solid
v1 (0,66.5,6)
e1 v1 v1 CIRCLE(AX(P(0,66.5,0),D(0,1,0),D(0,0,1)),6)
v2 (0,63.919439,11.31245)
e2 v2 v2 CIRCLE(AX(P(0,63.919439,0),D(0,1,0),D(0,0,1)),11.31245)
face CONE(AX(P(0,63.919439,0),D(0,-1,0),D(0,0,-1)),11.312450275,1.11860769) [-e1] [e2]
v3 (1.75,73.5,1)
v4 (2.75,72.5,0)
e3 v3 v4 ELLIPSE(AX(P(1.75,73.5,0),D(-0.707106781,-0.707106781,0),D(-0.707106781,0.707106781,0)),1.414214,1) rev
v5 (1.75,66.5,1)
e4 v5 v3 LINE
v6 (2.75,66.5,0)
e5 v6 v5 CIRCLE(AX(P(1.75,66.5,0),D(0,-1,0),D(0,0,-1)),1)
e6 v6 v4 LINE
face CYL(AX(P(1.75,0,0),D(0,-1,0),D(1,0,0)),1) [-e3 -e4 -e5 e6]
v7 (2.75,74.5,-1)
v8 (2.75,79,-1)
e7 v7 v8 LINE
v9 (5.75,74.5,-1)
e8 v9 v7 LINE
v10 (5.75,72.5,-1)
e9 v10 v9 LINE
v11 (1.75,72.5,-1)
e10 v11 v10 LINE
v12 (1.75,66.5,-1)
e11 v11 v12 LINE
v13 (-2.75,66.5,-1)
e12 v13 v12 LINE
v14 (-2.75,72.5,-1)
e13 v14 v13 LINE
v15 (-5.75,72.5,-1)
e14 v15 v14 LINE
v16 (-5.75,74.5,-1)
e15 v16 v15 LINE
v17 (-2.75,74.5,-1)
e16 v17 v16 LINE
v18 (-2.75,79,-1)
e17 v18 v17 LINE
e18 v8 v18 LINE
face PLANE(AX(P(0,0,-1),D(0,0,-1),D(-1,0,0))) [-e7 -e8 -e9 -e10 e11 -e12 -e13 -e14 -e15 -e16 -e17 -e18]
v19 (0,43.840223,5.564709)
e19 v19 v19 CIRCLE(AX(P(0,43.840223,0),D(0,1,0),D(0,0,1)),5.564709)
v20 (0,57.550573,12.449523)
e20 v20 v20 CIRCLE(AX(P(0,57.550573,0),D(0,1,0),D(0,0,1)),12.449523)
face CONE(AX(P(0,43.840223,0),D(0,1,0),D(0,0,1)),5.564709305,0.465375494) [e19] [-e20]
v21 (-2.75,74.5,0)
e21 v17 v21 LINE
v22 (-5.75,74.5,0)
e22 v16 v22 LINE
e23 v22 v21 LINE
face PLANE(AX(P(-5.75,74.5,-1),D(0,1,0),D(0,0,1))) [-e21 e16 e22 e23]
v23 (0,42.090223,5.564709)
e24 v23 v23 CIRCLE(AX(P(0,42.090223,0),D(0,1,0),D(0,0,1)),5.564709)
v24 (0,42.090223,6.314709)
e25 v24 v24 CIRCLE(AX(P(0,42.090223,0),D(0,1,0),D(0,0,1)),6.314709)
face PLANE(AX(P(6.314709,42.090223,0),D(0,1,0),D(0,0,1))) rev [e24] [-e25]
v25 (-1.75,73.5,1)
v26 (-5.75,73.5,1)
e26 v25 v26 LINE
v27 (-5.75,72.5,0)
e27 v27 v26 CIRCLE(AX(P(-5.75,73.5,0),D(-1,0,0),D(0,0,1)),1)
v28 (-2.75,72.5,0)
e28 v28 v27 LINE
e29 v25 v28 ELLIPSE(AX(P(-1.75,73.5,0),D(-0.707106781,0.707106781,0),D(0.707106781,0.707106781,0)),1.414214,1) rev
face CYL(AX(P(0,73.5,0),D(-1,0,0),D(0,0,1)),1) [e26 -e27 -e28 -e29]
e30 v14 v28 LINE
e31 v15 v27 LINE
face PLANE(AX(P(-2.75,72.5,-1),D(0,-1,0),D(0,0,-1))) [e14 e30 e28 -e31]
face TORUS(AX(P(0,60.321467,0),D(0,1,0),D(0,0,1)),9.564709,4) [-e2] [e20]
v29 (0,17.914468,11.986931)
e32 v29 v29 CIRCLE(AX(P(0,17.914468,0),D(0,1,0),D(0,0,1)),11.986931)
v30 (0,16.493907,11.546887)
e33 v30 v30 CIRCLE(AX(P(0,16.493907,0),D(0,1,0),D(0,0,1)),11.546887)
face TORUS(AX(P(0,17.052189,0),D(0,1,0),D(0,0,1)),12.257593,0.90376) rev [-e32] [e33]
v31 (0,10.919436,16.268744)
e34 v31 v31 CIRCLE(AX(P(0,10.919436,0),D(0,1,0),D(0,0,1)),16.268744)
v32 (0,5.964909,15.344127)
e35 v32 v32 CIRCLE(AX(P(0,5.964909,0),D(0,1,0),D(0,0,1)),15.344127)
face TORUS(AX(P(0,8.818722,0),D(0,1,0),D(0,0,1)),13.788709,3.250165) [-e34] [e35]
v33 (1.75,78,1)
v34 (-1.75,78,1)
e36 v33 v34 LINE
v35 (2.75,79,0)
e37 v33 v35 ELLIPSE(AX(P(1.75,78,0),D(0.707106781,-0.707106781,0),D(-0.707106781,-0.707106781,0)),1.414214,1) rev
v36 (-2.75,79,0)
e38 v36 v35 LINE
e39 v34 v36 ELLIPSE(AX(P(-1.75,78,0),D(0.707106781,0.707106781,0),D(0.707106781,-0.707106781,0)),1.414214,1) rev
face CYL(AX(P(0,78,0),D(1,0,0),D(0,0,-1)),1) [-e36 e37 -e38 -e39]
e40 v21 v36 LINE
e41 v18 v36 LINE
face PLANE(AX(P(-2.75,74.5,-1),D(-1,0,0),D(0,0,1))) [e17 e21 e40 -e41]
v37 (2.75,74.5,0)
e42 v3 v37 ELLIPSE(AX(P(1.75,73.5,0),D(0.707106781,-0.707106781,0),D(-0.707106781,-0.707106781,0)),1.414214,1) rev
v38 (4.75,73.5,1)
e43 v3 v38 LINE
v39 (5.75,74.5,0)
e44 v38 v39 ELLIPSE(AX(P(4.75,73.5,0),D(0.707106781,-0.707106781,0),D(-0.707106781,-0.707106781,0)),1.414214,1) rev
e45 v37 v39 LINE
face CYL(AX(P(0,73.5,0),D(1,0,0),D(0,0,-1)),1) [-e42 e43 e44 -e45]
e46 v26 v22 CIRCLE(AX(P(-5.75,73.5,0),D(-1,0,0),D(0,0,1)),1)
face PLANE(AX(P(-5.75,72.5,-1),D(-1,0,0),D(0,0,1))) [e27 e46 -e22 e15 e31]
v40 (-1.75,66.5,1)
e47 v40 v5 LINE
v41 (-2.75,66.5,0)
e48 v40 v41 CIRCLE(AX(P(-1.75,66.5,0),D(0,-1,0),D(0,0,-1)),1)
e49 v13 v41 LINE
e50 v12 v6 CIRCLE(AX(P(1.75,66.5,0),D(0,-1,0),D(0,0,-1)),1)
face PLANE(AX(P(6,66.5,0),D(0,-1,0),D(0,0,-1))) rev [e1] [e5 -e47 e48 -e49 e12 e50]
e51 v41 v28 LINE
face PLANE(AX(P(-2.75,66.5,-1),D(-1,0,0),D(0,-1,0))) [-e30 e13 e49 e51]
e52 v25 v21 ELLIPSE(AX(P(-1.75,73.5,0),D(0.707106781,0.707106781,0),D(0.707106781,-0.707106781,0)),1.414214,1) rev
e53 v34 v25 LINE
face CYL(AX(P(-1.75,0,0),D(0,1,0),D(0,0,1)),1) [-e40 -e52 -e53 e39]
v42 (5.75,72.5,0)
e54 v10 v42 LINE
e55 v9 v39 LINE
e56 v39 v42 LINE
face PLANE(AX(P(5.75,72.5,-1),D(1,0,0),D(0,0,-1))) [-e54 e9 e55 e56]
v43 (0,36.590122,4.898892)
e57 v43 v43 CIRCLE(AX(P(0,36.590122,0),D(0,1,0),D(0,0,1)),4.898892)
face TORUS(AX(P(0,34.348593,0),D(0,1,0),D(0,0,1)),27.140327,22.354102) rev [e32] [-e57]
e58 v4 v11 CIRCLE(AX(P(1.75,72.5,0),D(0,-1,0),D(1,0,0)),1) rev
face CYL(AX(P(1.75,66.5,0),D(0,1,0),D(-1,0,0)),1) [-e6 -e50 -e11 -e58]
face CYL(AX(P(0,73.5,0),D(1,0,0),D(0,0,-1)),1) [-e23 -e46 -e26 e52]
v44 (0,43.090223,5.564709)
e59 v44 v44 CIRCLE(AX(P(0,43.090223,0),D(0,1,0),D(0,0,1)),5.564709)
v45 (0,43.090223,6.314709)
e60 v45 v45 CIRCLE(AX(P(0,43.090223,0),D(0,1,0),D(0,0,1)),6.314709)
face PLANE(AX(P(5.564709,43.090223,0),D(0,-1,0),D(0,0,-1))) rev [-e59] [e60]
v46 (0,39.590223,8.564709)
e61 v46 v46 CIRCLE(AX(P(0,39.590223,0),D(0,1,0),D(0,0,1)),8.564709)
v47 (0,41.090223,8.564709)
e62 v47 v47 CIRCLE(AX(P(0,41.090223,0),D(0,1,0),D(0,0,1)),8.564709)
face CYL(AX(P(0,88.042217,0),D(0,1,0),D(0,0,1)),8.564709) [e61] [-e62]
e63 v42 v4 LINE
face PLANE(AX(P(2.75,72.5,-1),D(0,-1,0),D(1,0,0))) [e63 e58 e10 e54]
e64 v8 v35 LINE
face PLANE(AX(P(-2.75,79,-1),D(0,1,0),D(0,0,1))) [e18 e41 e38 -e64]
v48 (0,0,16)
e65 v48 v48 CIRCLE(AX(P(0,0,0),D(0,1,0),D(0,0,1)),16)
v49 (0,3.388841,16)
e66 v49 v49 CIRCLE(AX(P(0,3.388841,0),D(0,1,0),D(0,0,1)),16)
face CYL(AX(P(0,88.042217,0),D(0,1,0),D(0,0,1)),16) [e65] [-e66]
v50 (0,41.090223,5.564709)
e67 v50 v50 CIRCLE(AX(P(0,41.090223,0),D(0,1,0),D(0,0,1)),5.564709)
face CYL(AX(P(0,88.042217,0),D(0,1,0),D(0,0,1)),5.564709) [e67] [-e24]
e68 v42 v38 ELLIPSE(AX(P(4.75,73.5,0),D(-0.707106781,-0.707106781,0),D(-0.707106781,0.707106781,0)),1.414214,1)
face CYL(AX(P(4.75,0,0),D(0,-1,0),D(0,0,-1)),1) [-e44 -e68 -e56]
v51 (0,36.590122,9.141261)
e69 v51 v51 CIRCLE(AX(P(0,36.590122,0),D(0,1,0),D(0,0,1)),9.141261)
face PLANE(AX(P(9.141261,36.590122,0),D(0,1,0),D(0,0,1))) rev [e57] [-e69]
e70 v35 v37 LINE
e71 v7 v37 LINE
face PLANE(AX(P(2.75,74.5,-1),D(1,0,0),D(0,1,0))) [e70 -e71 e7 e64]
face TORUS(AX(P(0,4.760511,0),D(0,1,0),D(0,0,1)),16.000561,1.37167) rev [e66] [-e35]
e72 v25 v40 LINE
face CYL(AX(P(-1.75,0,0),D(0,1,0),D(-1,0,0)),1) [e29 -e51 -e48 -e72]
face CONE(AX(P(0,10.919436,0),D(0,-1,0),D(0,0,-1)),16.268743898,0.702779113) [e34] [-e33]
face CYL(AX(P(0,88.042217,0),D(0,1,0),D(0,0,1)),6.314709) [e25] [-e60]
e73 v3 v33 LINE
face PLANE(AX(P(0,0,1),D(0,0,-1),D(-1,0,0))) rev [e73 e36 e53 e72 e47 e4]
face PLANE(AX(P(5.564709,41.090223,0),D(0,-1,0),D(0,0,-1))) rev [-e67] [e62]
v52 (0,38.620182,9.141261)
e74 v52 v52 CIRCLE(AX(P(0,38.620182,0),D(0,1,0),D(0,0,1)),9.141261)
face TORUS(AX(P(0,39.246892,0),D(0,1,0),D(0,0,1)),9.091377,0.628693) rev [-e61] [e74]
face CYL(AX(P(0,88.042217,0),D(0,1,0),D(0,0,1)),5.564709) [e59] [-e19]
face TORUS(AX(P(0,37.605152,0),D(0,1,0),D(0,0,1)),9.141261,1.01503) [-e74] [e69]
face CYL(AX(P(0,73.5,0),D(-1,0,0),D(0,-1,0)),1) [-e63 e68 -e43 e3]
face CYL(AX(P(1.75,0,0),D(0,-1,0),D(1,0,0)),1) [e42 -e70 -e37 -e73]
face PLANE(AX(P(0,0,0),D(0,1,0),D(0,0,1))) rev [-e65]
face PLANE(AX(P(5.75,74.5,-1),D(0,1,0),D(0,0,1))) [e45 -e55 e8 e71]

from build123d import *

# Parameters (mm, degrees)
Y_KSEKLIK_EKSTR_ZYON1_DEPTH      = 1
Y_KSEKLIK_EKSTR_ZYON1_DEPTH_BACK = 1
RADYUS1_R                        = 1


with BuildPart() as part:
    # Çizim1 → Döndür2 (revolve)
    with BuildSketch(Plane.XY, mode=Mode.PRIVATE) as d_nd_r2_sk:
        with BuildLine():
            Line((0, 0), (16, 0))
            Line((16, 0), (16, 3.38884098))
            ThreePointArc((16, 3.38884098), (14.671297142, 4.422077286), (15.344126518, 5.964908832))
            ThreePointArc((15.344126518, 5.964908832), (16.983713634, 8.222467989), (16.268743898, 10.919436201))
            Line((16.268743898, 10.919436201), (11.546886806, 16.493906962))
            ThreePointArc((11.546886806, 16.493906962), (11.394303329, 17.319608619), (11.986931159, 17.914467594))
            ThreePointArc((11.986931159, 17.914467594), (6.240844544, 26.416536373), (4.898891797, 36.590122159))
            Line((4.898891797, 36.590122159), (9.141260906, 36.590122159))
            ThreePointArc((9.141260906, 36.590122159), (10.156290654, 37.605151906), (9.141260906, 38.620181653))
            ThreePointArc((9.141260906, 38.620181653), (8.550936954, 38.925677385), (8.564709305, 39.590222593))
            Line((8.564709305, 39.590222593), (8.564709305, 41.090222593))
            Line((8.564709305, 41.090222593), (5.564709305, 41.090222593))
            Line((5.564709305, 41.090222593), (5.564709305, 42.090222593))
            Line((5.564709305, 42.090222593), (6.314709305, 42.090222593))
            Line((6.314709305, 42.090222593), (6.314709305, 43.090222593))
            Line((6.314709305, 43.090222593), (5.564709305, 43.090222593))
            Line((5.564709305, 43.090222593), (5.564709305, 43.840222593))
            Line((5.564709305, 43.840222593), (12.449522519, 57.550572977))
            ThreePointArc((12.449522519, 57.550572977), (13.5024437, 61.024494443), (11.312450275, 63.919438685))
            Line((11.312450275, 63.919438685), (6, 66.5))
            Line((6, 66.5), (0, 66.5))
            Line((0, 66.5), (0, 0))
        make_face()
    revolve(d_nd_r2_sk.sketch.rotate(Axis((0, 88.042217112, 0), (0, -1, 0)), 90), axis=Axis((0, 88.042217112, 0), (0, -1, 0)))

    # Çizim2 → Yükseklik-Ekstrüzyon1 (add, two sides: drawn at the far end of the back side and taken through both)
    with BuildSketch(Plane.XY.offset(-Y_KSEKLIK_EKSTR_ZYON1_DEPTH_BACK)):
        Polygon((-2.75, 66.5), (-2.75, 72.5), (-5.75, 72.5), (-5.75, 74.5), (-2.75, 74.5), (-2.75, 79), (2.75, 79), (2.75, 74.5), (5.75, 74.5), (5.75, 72.5), (2.75, 72.5), (2.75, 66.5), align=None)
    extrude(amount=Y_KSEKLIK_EKSTR_ZYON1_DEPTH + Y_KSEKLIK_EKSTR_ZYON1_DEPTH_BACK)

    # Radyus1
    radyus1_edges = [part.edges().sort_by_distance(p)[0] for p in [
        (-2.75, 69.5, 1),
        (-4.25, 72.5, 1),
        (-4.25, 74.5, 1),
        (-2.75, 76.75, 1),
        (0, 79, 1),
        (2.75, 76.75, 1),
        (4.25, 74.5, 1),
        (5.75, 73.5, 1),
        (4.25, 72.5, 1),
        (2.75, 69.5, -1),
        (2.75, 69.5, 1),
    ]]
    fillet(radyus1_edges, radius=RADYUS1_R - 0.0001)  # a hair under: the kernel refuses the full size


solid = part.part
